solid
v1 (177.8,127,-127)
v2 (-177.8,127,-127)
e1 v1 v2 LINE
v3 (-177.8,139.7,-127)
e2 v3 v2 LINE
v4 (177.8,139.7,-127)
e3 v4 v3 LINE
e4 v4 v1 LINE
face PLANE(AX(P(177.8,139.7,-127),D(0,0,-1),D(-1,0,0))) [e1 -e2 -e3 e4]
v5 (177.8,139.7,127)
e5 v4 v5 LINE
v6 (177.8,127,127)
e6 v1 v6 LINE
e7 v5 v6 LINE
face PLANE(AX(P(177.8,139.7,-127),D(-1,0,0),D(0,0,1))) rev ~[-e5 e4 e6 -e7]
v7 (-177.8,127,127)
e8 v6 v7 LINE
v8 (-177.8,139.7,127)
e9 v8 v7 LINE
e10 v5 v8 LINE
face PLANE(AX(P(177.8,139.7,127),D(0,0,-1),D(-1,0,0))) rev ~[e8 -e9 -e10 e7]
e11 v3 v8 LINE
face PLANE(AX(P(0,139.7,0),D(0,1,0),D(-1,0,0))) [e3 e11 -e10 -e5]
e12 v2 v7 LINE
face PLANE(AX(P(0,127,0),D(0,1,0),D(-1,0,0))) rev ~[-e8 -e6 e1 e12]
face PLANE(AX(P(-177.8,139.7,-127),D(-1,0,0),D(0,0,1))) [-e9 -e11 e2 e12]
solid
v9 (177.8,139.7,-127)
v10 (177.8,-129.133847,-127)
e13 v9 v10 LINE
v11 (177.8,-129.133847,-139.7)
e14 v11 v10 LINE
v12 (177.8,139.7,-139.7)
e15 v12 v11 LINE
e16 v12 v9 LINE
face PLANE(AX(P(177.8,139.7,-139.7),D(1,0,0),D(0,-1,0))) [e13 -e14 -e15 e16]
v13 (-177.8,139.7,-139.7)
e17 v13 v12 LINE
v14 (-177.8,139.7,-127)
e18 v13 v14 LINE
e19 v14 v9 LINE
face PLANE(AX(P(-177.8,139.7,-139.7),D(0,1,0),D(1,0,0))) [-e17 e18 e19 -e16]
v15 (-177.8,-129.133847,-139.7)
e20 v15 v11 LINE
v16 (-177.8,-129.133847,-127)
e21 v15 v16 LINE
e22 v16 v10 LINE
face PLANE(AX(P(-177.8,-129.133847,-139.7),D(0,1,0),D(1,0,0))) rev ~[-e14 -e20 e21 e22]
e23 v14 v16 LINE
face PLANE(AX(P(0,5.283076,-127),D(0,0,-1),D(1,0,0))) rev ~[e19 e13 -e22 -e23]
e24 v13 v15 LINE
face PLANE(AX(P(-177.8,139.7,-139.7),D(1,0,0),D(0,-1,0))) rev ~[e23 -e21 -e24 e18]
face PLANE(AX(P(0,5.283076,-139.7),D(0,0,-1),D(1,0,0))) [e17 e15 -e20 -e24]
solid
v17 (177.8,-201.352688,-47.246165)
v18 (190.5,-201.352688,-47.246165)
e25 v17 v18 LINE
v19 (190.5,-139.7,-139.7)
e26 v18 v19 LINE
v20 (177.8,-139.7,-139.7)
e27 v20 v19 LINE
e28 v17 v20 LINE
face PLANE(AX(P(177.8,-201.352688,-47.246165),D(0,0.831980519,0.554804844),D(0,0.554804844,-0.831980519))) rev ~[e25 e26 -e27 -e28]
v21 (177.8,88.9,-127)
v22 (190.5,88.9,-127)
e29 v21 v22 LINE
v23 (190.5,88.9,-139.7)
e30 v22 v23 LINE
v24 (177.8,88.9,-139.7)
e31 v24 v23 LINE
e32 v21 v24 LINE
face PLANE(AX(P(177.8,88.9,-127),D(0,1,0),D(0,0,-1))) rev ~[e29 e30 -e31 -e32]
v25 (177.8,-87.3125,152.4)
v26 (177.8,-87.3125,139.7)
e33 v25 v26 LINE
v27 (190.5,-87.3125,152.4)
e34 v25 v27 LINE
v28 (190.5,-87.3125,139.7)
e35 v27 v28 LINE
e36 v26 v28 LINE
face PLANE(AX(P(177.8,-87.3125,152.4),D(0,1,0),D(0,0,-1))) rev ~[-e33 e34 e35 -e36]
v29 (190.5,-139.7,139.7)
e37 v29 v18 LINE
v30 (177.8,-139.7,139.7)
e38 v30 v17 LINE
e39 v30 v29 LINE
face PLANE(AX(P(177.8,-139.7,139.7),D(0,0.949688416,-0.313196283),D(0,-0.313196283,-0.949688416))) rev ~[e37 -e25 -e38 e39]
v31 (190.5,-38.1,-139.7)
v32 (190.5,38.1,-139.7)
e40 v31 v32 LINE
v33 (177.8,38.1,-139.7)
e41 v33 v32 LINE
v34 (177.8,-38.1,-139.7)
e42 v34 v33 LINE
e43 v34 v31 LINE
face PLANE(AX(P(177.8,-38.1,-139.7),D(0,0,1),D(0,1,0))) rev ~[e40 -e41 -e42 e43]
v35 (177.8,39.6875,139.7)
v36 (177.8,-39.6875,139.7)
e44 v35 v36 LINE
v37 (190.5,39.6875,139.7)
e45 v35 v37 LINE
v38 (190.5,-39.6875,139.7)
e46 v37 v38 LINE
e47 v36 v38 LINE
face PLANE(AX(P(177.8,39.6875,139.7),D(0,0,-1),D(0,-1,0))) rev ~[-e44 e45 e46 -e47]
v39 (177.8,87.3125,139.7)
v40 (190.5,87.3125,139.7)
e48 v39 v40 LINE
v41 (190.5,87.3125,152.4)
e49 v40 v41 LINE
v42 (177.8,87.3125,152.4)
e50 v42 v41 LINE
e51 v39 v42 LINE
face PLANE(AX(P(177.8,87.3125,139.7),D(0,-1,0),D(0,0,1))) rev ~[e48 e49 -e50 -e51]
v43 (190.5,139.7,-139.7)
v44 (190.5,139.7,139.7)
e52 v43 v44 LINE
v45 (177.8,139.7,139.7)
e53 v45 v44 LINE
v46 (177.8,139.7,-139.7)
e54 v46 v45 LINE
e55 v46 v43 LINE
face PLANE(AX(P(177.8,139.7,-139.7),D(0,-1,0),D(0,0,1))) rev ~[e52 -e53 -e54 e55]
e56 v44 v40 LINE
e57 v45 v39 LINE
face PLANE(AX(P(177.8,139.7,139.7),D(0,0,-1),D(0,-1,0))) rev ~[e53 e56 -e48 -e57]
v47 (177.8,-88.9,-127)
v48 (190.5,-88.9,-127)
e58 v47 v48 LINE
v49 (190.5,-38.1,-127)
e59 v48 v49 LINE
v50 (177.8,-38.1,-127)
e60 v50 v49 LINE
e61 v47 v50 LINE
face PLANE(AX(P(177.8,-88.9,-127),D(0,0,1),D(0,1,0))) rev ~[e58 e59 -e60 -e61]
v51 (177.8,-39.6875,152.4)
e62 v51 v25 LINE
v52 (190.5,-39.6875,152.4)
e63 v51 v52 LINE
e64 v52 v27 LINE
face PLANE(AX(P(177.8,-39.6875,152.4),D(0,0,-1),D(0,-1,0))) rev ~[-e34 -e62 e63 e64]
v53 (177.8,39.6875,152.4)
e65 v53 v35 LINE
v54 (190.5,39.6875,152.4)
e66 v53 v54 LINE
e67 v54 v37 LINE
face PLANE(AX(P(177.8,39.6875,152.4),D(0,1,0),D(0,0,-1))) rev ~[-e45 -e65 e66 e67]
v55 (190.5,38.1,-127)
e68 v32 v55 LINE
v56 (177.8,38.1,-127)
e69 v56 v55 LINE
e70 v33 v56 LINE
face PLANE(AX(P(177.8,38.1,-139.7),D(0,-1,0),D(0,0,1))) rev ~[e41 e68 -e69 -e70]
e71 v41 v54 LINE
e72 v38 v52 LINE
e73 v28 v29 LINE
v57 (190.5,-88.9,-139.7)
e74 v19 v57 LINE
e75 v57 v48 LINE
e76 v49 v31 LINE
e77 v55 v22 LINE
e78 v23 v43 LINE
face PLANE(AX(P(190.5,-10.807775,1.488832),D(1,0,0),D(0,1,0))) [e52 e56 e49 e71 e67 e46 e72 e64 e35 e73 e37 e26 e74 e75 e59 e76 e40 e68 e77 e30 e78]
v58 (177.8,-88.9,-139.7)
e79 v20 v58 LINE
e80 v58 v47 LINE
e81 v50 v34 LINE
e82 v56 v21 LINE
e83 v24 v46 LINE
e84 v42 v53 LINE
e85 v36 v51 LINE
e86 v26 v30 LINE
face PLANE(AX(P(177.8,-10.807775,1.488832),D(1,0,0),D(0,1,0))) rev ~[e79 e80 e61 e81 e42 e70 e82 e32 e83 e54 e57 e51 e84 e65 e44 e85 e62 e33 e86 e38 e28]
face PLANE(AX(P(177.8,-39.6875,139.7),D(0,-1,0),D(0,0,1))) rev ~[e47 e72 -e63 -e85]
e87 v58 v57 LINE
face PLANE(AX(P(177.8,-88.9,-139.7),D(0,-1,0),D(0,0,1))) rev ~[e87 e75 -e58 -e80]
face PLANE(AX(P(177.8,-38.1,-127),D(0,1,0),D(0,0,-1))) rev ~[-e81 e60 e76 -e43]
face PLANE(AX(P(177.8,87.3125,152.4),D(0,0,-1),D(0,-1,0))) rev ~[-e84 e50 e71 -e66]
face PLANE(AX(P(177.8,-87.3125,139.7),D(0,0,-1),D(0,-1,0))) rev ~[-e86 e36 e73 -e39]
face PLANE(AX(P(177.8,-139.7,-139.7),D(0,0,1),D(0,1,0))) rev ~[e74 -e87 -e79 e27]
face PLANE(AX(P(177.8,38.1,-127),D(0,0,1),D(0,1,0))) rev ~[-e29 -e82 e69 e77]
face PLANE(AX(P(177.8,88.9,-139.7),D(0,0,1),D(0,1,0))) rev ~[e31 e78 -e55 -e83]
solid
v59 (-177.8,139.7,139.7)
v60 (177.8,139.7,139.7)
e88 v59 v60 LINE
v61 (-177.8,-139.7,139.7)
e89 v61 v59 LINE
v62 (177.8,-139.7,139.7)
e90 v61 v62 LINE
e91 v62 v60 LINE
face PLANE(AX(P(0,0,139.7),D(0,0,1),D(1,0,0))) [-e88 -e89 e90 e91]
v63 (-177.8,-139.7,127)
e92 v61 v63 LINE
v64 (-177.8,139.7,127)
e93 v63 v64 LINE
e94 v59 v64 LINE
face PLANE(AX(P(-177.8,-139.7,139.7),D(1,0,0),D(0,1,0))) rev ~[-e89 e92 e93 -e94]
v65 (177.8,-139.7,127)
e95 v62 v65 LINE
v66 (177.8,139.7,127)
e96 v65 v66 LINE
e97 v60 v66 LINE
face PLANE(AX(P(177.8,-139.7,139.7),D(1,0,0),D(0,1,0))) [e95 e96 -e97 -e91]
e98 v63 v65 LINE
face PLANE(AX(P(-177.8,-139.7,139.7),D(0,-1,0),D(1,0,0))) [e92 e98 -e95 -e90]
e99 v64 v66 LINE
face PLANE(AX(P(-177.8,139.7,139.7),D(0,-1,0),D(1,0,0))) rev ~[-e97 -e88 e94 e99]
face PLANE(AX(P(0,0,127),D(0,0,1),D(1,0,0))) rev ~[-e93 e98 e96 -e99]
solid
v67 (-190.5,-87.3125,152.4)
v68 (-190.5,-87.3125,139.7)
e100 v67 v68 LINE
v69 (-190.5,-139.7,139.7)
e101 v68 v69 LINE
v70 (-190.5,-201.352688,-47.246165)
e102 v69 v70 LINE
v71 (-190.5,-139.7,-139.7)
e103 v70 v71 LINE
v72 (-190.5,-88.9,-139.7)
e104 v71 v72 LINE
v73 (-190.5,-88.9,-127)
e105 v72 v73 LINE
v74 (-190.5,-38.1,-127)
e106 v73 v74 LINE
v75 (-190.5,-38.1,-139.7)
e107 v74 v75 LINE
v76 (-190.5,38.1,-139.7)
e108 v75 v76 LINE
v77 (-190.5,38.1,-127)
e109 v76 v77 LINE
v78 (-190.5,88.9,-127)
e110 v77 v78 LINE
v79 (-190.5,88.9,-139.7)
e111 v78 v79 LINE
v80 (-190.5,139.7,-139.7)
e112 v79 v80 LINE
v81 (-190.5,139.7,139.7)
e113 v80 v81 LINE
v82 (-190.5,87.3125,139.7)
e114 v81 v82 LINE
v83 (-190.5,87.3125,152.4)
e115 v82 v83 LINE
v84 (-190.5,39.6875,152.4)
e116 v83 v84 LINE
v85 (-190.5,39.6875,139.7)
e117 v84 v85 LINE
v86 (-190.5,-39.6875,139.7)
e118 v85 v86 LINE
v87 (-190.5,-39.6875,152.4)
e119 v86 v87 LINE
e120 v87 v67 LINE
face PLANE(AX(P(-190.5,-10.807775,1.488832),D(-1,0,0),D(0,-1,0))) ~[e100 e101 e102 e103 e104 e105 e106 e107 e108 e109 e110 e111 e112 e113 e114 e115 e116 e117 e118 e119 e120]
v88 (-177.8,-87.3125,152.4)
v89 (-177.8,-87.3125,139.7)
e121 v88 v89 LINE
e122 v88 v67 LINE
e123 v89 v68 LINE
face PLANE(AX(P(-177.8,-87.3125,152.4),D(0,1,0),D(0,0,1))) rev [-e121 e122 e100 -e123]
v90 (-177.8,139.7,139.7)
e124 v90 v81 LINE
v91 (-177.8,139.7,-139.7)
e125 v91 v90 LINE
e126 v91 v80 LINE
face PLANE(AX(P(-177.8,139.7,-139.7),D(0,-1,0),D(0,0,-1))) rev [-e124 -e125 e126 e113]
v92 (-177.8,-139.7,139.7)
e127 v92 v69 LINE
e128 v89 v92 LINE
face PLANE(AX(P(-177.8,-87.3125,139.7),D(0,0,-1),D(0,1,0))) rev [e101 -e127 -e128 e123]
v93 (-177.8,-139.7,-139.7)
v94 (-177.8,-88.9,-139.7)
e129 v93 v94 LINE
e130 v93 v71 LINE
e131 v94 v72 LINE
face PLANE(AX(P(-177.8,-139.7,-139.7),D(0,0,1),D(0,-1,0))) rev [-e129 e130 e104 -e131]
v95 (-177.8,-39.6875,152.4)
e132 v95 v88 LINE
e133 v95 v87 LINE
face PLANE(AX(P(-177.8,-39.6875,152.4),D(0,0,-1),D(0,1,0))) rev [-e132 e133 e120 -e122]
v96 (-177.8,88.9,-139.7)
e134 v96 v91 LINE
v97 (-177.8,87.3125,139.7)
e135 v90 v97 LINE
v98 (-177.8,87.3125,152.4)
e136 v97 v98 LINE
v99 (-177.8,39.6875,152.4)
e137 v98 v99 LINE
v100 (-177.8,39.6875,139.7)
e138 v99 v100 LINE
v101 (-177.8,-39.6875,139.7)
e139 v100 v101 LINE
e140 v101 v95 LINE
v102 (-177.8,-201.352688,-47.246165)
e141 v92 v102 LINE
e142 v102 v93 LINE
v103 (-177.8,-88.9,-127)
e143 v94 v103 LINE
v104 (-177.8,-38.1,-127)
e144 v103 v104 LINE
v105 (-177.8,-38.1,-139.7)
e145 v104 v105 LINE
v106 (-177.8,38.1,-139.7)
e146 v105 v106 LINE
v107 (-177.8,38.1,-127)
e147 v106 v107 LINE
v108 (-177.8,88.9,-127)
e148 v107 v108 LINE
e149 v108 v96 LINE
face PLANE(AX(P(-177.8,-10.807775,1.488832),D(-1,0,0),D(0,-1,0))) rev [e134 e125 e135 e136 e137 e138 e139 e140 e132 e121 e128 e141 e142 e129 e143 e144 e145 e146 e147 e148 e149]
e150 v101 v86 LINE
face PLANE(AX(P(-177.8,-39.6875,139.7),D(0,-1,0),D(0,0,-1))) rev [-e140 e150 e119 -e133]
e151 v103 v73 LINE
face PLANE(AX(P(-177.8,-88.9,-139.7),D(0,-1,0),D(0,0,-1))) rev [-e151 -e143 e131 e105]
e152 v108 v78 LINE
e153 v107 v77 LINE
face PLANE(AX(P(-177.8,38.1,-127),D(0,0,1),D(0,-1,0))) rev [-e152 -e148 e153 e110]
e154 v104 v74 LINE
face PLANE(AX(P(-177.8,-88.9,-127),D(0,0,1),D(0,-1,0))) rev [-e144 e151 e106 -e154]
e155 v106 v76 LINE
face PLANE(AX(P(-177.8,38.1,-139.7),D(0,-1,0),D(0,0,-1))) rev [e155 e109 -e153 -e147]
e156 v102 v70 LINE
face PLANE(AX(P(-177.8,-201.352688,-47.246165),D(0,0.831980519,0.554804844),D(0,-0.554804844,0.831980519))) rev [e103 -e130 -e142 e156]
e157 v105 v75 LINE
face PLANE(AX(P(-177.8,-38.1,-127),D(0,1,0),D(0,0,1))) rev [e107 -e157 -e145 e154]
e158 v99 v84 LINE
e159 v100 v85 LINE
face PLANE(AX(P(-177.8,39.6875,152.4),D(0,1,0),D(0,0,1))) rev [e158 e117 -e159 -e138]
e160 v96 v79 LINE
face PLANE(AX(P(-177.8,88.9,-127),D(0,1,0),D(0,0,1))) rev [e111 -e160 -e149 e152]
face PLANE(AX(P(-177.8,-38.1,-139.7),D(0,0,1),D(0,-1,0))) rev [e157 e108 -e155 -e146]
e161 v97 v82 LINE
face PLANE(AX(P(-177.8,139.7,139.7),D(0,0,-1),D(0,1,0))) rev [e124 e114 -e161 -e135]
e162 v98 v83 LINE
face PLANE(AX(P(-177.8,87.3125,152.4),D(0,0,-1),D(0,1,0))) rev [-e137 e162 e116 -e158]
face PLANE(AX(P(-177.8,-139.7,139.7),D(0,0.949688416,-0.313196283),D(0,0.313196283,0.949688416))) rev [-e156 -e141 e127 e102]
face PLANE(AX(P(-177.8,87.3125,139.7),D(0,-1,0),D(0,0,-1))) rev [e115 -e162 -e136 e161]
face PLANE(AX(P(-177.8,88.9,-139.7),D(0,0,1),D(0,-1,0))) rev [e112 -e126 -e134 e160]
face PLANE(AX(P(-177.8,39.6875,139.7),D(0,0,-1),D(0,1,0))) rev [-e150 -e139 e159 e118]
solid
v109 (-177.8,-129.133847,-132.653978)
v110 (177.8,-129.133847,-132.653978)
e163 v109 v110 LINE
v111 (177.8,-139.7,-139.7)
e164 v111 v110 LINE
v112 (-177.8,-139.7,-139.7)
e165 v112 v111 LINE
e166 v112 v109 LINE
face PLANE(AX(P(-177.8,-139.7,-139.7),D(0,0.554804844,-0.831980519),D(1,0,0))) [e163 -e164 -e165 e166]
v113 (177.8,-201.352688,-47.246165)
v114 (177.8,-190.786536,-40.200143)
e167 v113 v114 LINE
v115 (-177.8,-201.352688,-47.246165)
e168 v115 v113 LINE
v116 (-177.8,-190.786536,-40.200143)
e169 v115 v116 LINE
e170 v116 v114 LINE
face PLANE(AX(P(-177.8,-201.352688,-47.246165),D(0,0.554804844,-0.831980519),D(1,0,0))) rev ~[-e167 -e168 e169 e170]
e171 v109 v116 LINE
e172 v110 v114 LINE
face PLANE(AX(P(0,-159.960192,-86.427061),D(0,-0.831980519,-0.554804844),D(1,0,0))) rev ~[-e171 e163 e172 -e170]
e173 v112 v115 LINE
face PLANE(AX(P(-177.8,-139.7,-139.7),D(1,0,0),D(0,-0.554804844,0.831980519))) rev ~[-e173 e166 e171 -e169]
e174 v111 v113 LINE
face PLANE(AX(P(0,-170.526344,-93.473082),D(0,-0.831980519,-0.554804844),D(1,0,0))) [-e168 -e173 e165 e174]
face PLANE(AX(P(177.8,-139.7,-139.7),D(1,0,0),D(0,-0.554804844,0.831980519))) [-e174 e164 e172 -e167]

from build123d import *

# Parameters (mm, degrees)
F3_START  = 177.8
F3_DEPTH  = 12.7
F5_W      = 355.6
F5_H      = 279.4
F6_DEPTH  = 12.7
F7_W      = 355.6
F7_H      = 111.125
F8_DEPTH  = 12.7
F9_W      = 355.6
F9_H      = 268.8338474026
F10_DEPTH = 12.7
F11_W     = 355.6
F11_H     = 254
F12_DEPTH = 12.7


# Not quite as in the source:
# - a variable given as a bare number and used for a length is read in inches; the dataset says mm whatever the document's units were


with BuildPart() as f3:
    # F2 (on Right) → F3 (new body)
    with BuildSketch(Plane.YZ.offset(F3_START)):
        Polygon((139.7, -139.7), (139.7, 139.7), (87.3125, 139.7), (87.3125, 152.4), (39.6875, 152.4), (39.6875, 139.7), (0, 139.7), (-39.6875, 139.7), (-39.6875, 152.4), (-87.3125, 152.4), (-87.3125, 139.7), (-139.7, 139.7), (-201.3526883174, -47.2461647727), (-139.7, -139.7), (-88.9, -139.7), (-88.9, -127), (-38.1, -127), (-38.1, -139.7), (0, -139.7), (38.1, -139.7), (38.1, -127), (88.9, -127), (88.9, -139.7), align=None)
    extrude(amount=F3_DEPTH)


with BuildPart() as f4_1:
    # F4: instance of F3
    add(f3.part.mirror(Plane.YZ))


with BuildPart() as f6:
    # F5 (on face) → F6 (new body)
    with BuildSketch(Plane.XY.offset(139.7)):
        Rectangle(F5_W, F5_H)
    extrude(amount=-F6_DEPTH)


with BuildPart() as f8:
    # F7 (on face) → F8 (new body)
    with BuildSketch(Plane(origin=(0, -161.1828435034, -107.4845147117), x_dir=(1, 0, 0), z_dir=(0, -0.8319805195, -0.5548048443))):
        with Locations((0, 16.8410581705)):
            Rectangle(F7_W, F7_H)
    extrude(amount=-F8_DEPTH)


with BuildPart() as f10:
    # F9 (on face) → F10 (new body)
    with BuildSketch(Plane(origin=(0, 0, -139.7), x_dir=(1, 0, 0), z_dir=(0, 0, -1))):
        with Locations((0, -5.2830762987)):
            Rectangle(F9_W, F9_H)
    extrude(amount=-F10_DEPTH)


with BuildPart() as f12:
    # F11 (on face) → F12 (new body)
    with BuildSketch(Plane(origin=(0, 139.7, 0), x_dir=(-1, 0, 0), z_dir=(0, 1, 0))):
        Rectangle(F11_W, F11_H)
    extrude(amount=-F12_DEPTH)


solid = Compound([f3.part, f4_1.part, f6.part, f8.part, f10.part, f12.part])
